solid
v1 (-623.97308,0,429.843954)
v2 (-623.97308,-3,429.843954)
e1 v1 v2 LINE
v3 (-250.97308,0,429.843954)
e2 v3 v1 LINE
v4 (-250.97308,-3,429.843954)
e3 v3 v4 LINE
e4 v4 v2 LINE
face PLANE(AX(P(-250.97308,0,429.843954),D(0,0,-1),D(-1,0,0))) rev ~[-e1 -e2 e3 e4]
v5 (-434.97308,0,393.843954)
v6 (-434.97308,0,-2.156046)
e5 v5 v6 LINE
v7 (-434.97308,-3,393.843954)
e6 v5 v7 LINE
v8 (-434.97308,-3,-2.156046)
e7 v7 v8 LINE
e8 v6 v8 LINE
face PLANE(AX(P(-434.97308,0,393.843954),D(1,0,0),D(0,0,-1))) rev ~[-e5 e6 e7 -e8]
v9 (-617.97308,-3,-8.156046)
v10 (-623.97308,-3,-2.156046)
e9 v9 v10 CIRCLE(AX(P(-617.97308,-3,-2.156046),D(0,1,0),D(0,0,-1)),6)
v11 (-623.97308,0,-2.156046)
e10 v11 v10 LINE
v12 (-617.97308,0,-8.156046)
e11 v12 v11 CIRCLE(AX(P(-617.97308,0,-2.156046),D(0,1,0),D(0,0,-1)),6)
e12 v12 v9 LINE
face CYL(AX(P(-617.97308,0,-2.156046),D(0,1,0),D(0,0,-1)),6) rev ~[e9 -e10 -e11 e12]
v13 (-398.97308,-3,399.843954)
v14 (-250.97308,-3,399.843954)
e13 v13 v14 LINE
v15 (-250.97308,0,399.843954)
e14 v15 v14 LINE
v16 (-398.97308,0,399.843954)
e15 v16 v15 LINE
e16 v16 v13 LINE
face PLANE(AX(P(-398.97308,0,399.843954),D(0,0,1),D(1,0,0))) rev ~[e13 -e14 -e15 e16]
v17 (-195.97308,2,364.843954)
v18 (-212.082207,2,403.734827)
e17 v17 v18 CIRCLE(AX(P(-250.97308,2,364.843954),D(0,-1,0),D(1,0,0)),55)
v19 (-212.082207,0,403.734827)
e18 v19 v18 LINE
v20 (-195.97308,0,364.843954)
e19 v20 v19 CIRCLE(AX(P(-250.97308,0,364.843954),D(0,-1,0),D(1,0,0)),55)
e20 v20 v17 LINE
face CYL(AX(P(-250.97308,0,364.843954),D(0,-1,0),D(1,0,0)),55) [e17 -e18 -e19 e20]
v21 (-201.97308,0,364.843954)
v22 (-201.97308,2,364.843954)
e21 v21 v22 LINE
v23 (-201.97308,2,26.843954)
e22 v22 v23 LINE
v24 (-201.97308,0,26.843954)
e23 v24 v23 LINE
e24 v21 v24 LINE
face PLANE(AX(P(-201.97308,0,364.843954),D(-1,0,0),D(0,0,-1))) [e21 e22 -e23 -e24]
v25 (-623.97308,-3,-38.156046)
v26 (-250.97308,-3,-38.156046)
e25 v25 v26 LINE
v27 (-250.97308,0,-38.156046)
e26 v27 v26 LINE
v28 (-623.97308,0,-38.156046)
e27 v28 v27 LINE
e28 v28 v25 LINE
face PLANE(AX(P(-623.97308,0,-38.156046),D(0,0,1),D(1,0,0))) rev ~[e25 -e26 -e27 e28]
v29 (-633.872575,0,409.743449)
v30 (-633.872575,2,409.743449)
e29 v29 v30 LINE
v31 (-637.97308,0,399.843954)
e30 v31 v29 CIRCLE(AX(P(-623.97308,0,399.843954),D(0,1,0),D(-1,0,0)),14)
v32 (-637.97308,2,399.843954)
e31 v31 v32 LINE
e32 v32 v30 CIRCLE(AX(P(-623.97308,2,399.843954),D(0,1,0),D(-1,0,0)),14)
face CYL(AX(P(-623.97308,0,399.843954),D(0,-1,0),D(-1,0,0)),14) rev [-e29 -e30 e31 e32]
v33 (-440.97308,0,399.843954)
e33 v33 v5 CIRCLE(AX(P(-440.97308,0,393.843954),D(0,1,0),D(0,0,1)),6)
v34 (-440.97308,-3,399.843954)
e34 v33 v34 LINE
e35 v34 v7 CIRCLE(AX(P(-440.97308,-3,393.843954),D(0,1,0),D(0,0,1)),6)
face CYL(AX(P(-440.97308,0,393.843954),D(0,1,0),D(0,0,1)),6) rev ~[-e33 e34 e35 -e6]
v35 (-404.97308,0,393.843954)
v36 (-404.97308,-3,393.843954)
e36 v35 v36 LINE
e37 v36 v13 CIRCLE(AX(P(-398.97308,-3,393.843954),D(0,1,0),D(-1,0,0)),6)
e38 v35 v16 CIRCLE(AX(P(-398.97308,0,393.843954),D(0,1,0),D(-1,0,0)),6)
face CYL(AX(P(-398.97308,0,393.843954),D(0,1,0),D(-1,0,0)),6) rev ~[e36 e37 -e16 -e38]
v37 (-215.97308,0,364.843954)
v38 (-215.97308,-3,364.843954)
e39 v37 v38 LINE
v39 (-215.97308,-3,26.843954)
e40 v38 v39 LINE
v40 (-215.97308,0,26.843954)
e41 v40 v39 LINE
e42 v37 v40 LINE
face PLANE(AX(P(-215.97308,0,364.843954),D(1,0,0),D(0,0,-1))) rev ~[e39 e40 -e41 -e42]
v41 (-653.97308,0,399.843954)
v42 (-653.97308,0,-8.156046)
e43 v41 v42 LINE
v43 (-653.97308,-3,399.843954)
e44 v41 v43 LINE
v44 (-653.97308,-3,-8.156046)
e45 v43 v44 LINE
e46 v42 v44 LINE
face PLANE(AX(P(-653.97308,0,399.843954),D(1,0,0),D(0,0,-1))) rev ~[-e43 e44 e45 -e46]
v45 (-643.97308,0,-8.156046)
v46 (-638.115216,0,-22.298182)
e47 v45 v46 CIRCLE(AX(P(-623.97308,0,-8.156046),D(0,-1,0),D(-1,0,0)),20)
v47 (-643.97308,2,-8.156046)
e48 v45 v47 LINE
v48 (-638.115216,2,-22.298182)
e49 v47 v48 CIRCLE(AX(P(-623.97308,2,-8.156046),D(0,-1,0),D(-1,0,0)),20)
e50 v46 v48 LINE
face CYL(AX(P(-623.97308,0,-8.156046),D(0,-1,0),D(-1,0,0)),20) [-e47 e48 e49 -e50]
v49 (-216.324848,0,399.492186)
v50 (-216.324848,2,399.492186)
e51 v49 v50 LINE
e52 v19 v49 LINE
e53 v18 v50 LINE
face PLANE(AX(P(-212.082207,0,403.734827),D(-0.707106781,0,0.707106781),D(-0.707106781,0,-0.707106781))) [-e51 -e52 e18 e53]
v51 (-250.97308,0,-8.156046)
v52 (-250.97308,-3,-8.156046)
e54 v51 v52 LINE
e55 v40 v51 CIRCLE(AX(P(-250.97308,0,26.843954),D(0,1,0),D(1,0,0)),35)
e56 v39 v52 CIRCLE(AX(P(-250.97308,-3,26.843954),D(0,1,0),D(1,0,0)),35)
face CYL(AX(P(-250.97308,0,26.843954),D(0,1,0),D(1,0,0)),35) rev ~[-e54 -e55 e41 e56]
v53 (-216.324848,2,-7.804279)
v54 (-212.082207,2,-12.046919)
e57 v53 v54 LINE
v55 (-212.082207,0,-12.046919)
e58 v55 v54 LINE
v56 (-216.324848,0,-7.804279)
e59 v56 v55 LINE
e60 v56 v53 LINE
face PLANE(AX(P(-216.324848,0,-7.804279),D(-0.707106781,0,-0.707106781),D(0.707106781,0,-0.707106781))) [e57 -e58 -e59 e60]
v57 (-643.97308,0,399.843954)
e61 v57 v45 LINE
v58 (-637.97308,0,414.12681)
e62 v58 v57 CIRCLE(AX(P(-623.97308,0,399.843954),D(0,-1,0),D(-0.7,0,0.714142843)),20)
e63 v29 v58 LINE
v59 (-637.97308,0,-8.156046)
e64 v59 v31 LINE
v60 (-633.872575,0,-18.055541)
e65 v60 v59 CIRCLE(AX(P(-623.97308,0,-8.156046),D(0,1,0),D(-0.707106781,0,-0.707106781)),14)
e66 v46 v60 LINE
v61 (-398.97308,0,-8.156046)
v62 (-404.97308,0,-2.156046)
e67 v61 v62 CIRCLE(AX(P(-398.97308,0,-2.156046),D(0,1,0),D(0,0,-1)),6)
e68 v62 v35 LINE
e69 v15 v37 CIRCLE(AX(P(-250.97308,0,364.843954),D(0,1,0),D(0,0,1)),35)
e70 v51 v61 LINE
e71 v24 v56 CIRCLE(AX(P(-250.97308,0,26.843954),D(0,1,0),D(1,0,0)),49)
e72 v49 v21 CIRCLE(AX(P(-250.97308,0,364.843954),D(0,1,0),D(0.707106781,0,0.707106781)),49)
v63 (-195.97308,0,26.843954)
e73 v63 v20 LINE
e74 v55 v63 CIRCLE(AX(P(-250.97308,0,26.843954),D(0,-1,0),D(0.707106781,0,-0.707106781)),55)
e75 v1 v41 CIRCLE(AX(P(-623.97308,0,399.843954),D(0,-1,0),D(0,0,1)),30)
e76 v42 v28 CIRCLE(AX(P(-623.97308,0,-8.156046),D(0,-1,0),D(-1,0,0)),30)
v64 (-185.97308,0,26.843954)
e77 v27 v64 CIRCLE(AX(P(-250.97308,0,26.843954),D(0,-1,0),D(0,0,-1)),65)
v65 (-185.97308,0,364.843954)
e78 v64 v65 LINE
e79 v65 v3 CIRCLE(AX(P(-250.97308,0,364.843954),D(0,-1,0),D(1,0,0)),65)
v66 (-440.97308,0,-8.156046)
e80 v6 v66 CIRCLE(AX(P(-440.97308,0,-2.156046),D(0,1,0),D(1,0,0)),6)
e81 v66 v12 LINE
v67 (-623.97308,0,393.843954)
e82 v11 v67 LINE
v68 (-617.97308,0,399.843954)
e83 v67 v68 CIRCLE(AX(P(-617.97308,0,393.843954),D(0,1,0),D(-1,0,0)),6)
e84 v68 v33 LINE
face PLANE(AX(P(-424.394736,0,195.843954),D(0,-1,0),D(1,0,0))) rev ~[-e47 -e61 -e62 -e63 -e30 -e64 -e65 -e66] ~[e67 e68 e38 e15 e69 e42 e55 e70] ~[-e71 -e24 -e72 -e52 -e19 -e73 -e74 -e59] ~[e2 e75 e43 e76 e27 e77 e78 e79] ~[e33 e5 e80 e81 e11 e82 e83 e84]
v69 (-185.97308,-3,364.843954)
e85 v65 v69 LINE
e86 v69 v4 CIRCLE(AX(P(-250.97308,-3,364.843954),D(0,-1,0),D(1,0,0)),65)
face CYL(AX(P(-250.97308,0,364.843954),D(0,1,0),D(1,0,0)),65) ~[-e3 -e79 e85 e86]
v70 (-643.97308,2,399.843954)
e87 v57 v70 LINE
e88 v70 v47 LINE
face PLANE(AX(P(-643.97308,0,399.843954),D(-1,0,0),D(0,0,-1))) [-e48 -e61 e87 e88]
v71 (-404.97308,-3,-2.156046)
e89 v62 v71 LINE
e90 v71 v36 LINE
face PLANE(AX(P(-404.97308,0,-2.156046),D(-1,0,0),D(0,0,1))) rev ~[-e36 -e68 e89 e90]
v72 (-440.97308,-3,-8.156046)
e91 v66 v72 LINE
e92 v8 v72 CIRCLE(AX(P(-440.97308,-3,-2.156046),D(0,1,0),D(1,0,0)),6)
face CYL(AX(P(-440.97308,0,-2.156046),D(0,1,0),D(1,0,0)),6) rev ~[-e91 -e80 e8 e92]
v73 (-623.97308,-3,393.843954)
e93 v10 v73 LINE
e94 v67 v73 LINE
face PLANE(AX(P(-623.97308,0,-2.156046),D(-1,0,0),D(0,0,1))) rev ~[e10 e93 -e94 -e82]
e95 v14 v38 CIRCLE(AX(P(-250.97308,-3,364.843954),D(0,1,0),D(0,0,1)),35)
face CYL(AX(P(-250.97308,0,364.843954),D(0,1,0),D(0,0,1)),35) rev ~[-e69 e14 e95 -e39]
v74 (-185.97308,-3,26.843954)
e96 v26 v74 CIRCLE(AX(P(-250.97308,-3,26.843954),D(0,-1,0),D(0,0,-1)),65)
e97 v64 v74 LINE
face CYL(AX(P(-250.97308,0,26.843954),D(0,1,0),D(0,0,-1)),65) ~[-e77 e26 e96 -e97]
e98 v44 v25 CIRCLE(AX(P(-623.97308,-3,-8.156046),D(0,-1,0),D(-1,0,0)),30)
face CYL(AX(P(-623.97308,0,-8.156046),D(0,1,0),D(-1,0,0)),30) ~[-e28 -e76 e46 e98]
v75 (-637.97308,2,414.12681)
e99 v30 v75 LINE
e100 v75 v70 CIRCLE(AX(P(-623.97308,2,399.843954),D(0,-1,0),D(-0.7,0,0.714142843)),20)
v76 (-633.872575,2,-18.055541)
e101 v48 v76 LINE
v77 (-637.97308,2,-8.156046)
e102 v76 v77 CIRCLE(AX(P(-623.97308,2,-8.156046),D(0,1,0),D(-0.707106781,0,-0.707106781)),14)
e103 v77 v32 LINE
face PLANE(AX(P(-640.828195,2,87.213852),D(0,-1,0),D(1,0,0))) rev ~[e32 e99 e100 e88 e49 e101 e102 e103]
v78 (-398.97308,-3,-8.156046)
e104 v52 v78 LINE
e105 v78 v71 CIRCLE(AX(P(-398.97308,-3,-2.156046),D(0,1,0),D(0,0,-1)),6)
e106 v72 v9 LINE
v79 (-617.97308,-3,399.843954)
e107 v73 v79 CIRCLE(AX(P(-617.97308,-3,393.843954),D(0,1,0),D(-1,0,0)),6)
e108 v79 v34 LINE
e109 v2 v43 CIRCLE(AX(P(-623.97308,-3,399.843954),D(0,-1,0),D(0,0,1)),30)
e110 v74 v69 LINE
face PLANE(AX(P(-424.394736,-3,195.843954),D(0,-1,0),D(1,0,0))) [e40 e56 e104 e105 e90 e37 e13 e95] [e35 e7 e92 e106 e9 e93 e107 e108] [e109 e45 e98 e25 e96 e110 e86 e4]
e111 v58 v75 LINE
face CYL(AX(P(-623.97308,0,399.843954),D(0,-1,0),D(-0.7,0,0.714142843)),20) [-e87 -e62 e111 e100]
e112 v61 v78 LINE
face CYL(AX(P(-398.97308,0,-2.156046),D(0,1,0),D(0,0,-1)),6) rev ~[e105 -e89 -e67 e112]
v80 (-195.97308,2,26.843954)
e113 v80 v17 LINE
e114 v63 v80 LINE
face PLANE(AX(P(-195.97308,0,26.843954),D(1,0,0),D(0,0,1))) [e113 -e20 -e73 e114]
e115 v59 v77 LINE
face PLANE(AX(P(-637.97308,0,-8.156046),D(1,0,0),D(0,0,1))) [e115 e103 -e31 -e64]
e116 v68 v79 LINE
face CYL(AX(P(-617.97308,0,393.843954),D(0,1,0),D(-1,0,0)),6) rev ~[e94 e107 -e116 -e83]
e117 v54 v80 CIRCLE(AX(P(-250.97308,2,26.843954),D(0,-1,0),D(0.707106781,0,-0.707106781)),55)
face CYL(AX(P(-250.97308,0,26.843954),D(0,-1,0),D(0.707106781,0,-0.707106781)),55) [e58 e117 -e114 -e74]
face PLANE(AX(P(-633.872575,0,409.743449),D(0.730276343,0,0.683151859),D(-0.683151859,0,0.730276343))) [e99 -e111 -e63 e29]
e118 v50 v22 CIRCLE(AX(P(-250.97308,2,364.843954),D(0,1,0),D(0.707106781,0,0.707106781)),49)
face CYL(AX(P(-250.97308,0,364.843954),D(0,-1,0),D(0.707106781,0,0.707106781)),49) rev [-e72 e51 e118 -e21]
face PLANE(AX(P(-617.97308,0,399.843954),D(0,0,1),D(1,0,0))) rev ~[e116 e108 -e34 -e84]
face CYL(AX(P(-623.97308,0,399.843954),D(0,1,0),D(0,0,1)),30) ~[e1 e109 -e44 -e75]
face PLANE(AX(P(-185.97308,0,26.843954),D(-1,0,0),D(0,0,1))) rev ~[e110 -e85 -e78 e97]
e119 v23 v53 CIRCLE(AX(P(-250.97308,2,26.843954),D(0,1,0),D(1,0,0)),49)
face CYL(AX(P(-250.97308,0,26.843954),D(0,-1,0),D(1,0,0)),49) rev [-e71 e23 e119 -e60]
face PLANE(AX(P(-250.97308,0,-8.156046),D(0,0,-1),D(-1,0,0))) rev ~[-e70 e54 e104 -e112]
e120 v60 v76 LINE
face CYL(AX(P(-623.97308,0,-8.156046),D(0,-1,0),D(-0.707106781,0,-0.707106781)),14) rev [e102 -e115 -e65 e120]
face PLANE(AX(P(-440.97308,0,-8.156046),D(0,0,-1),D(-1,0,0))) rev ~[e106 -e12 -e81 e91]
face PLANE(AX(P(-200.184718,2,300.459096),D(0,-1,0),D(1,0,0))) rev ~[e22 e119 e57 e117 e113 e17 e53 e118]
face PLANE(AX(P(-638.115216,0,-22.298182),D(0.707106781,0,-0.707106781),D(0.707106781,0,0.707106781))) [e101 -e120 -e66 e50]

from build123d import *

# Parameters (mm, degrees)
F1_DEPTH = 3
F2_DEPTH = 2


# Not quite as in the source:
# - a feature names something its author has since deleted; it is built from what else it names


with BuildPart() as f1:
    # F0 (on Front) → F1 (new body)
    with BuildSketch(Plane.XZ):
        with BuildLine():
            Line((-185.9730800638, 26.8439535797), (-185.9730800638, 364.8439535797))
            ThreePointArc((-185.9730800638, 364.8439535797), (-205.0111392867, 410.8058943568), (-250.9730800638, 429.8439535797))
            Line((-250.9730800638, 429.8439535797), (-623.9730800638, 429.8439535797))
            ThreePointArc((-623.9730800638, 429.8439535797), (-645.1862834994, 421.0571570153), (-653.9730800638, 399.8439535797))
            Line((-653.9730800638, 399.8439535797), (-653.9730800638, -8.1560464203))
            ThreePointArc((-653.9730800638, -8.1560464203), (-645.1862834994, -29.3692498559), (-623.9730800638, -38.1560464203))
            Line((-623.9730800638, -38.1560464203), (-250.9730800638, -38.1560464203))
            ThreePointArc((-250.9730800638, -38.1560464203), (-205.0111392867, -19.1179871975), (-185.9730800638, 26.8439535797))
        make_face()
        with BuildLine():
            ThreePointArc((-637.9730800638, 414.1268104367), (-631.5342592992, 418.3595839651), (-623.9730800638, 419.8439535797))
            Line((-623.9730800638, 419.8439535797), (-250.9730800638, 419.8439535797))
            ThreePointArc((-250.9730800638, 419.8439535797), (-229.9254912838, 415.6573278678), (-212.0822070986, 403.7348265449))
            ThreePointArc((-212.0822070986, 403.7348265449), (-200.1597057757, 385.8915423597), (-195.9730800638, 364.8439535797))
            Line((-195.9730800638, 364.8439535797), (-195.9730800638, 195.8439535797))
            Line((-195.9730800638, 195.8439535797), (-195.9730800638, 26.8439535797))
            ThreePointArc((-195.9730800638, 26.8439535797), (-200.1597057757, 5.7963647996), (-212.0822070986, -12.0469193856))
            ThreePointArc((-212.0822070986, -12.0469193856), (-229.9254912838, -23.9694207085), (-250.9730800638, -28.1560464203))
            Line((-250.9730800638, -28.1560464203), (-623.9730800638, -28.1560464203))
            ThreePointArc((-623.9730800638, -28.1560464203), (-631.6267487111, -26.6336370706), (-638.1152156876, -22.2981820441))
            ThreePointArc((-638.1152156876, -22.2981820441), (-642.4506707141, -15.8097150676), (-643.9730800638, -8.1560464203))
            Line((-643.9730800638, -8.1560464203), (-643.9730800638, 195.8439535797))
            Line((-643.9730800638, 195.8439535797), (-643.9730800638, 399.8439535797))
            ThreePointArc((-643.9730800638, 399.8439535797), (-642.4121689784, 407.5899202721), (-637.9730800638, 414.1268104367))
        make_face(mode=Mode.SUBTRACT)
        with BuildLine():
            ThreePointArc((-623.9730800638, 413.8439535797), (-629.330648117, 412.7782670348), (-633.8725750005, 409.7434485163))
            ThreePointArc((-633.8725750005, 409.7434485163), (-636.907393519, 405.2015216328), (-637.9730800638, 399.8439535797))
            Line((-637.9730800638, 399.8439535797), (-637.9730800638, 195.8439535797))
            Line((-637.9730800638, 195.8439535797), (-637.9730800638, -8.1560464203))
            ThreePointArc((-637.9730800638, -8.1560464203), (-636.907393519, -13.5136144734), (-633.8725750005, -18.0555413569))
            ThreePointArc((-633.8725750005, -18.0555413569), (-629.330648117, -21.0903598755), (-623.9730800638, -22.1560464203))
            Line((-623.9730800638, -22.1560464203), (-428.9730800638, -22.1560464203))
            ThreePointArc((-428.9730800638, -22.1560464203), (-424.7304393767, -20.3986871075), (-422.9730800638, -16.1560464203))
            Line((-422.9730800638, -16.1560464203), (-422.9730800638, 407.8439535797))
            ThreePointArc((-422.9730800638, 407.8439535797), (-424.7304393767, 412.0865942668), (-428.9730800638, 413.8439535797))
            Line((-428.9730800638, 413.8439535797), (-623.9730800638, 413.8439535797))
        make_face()
        with BuildLine():
            Line((-623.9730800638, -2.1560464203), (-623.9730800638, 393.8439535797))
            ThreePointArc((-623.9730800638, 393.8439535797), (-622.215720751, 398.0865942668), (-617.9730800638, 399.8439535797))
            Line((-617.9730800638, 399.8439535797), (-440.9730800638, 399.8439535797))
            ThreePointArc((-440.9730800638, 399.8439535797), (-436.7304393767, 398.0865942668), (-434.9730800638, 393.8439535797))
            Line((-434.9730800638, 393.8439535797), (-434.9730800638, -2.1560464203))
            ThreePointArc((-434.9730800638, -2.1560464203), (-436.7304393767, -6.3986871075), (-440.9730800638, -8.1560464203))
            Line((-440.9730800638, -8.1560464203), (-617.9730800638, -8.1560464203))
            ThreePointArc((-617.9730800638, -8.1560464203), (-622.215720751, -6.3986871075), (-623.9730800638, -2.1560464203))
        make_face(mode=Mode.SUBTRACT)
        with BuildLine():
            ThreePointArc((-201.9730800638, 364.8439535797), (-205.7029829708, 383.5954417656), (-216.3248477857, 399.4921858578))
            ThreePointArc((-216.3248477857, 399.4921858578), (-232.221591878, 410.1140506727), (-250.9730800638, 413.8439535797))
            Line((-250.9730800638, 413.8439535797), (-410.9730800638, 413.8439535797))
            ThreePointArc((-410.9730800638, 413.8439535797), (-415.215720751, 412.0865942668), (-416.9730800638, 407.8439535797))
            Line((-416.9730800638, 407.8439535797), (-416.9730800638, -16.1560464203))
            ThreePointArc((-416.9730800638, -16.1560464203), (-415.215720751, -20.3986871075), (-410.9730800638, -22.1560464203))
            Line((-410.9730800638, -22.1560464203), (-250.9730800638, -22.1560464203))
            ThreePointArc((-250.9730800638, -22.1560464203), (-232.221591878, -18.4261435134), (-216.3248477857, -7.8042786985))
            ThreePointArc((-216.3248477857, -7.8042786985), (-205.7029829708, 8.0924653938), (-201.9730800638, 26.8439535797))
            Line((-201.9730800638, 26.8439535797), (-201.9730800638, 195.8439535797))
            Line((-201.9730800638, 195.8439535797), (-201.9730800638, 364.8439535797))
        make_face()
        with BuildLine():
            ThreePointArc((-404.9730800638, 393.8439535797), (-403.215720751, 398.0865942668), (-398.9730800638, 399.8439535797))
            Line((-398.9730800638, 399.8439535797), (-250.9730800638, 399.8439535797))
            ThreePointArc((-250.9730800638, 399.8439535797), (-226.2243427223, 389.5926909212), (-215.9730800638, 364.8439535797))
            Line((-215.9730800638, 364.8439535797), (-215.9730800638, 26.8439535797))
            ThreePointArc((-215.9730800638, 26.8439535797), (-226.2243427223, 2.0952162381), (-250.9730800638, -8.1560464203))
            Line((-250.9730800638, -8.1560464203), (-398.9730800638, -8.1560464203))
            ThreePointArc((-398.9730800638, -8.1560464203), (-403.215720751, -6.3986871075), (-404.9730800638, -2.1560464203))
            Line((-404.9730800638, -2.1560464203), (-404.9730800638, 393.8439535797))
        make_face(mode=Mode.SUBTRACT)
        with BuildLine():
            Line((-250.9730800638, 419.8439535797), (-623.9730800638, 419.8439535797))
            ThreePointArc((-623.9730800638, 419.8439535797), (-631.5342592992, 418.3595839651), (-637.9730800638, 414.1268104367))
            Line((-637.9730800638, 414.1268104367), (-633.8725750005, 409.7434485163))
            ThreePointArc((-633.8725750005, 409.7434485163), (-629.330648117, 412.7782670348), (-623.9730800638, 413.8439535797))
            Line((-623.9730800638, 413.8439535797), (-428.9730800638, 413.8439535797))
            ThreePointArc((-428.9730800638, 413.8439535797), (-424.7304393767, 412.0865942668), (-422.9730800638, 407.8439535797))
            Line((-422.9730800638, 407.8439535797), (-422.9730800638, -16.1560464203))
            ThreePointArc((-422.9730800638, -16.1560464203), (-424.7304393767, -20.3986871075), (-428.9730800638, -22.1560464203))
            Line((-428.9730800638, -22.1560464203), (-623.9730800638, -22.1560464203))
            ThreePointArc((-623.9730800638, -22.1560464203), (-629.330648117, -21.0903598755), (-633.8725750005, -18.0555413569))
            Line((-633.8725750005, -18.0555413569), (-638.1152156876, -22.2981820441))
            ThreePointArc((-638.1152156876, -22.2981820441), (-631.6267487111, -26.6336370706), (-623.9730800638, -28.1560464203))
            Line((-623.9730800638, -28.1560464203), (-250.9730800638, -28.1560464203))
            ThreePointArc((-250.9730800638, -28.1560464203), (-229.9254912838, -23.9694207085), (-212.0822070986, -12.0469193856))
            Line((-212.0822070986, -12.0469193856), (-216.3248477857, -7.8042786985))
            ThreePointArc((-216.3248477857, -7.8042786985), (-232.221591878, -18.4261435134), (-250.9730800638, -22.1560464203))
            Line((-250.9730800638, -22.1560464203), (-410.9730800638, -22.1560464203))
            ThreePointArc((-410.9730800638, -22.1560464203), (-415.215720751, -20.3986871075), (-416.9730800638, -16.1560464203))
            Line((-416.9730800638, -16.1560464203), (-416.9730800638, 407.8439535797))
            ThreePointArc((-416.9730800638, 407.8439535797), (-415.215720751, 412.0865942668), (-410.9730800638, 413.8439535797))
            Line((-410.9730800638, 413.8439535797), (-250.9730800638, 413.8439535797))
            ThreePointArc((-250.9730800638, 413.8439535797), (-232.221591878, 410.1140506727), (-216.3248477857, 399.4921858578))
            Line((-216.3248477857, 399.4921858578), (-212.0822070986, 403.7348265449))
            ThreePointArc((-212.0822070986, 403.7348265449), (-229.9254912838, 415.6573278678), (-250.9730800638, 419.8439535797))
        make_face()
        with BuildLine():
            Line((-633.8725750005, 409.7434485163), (-637.9730800638, 414.1268104367))
            ThreePointArc((-637.9730800638, 414.1268104367), (-642.4121689784, 407.5899202721), (-643.9730800638, 399.8439535797))
            Line((-643.9730800638, 399.8439535797), (-643.9730800638, 195.8439535797))
            Line((-643.9730800638, 195.8439535797), (-637.9730800638, 195.8439535797))
            Line((-637.9730800638, 195.8439535797), (-637.9730800638, 399.8439535797))
            ThreePointArc((-637.9730800638, 399.8439535797), (-636.907393519, 405.2015216328), (-633.8725750005, 409.7434485163))
        make_face()
        with BuildLine():
            Line((-637.9730800638, 195.8439535797), (-643.9730800638, 195.8439535797))
            Line((-643.9730800638, 195.8439535797), (-643.9730800638, -8.1560464203))
            ThreePointArc((-643.9730800638, -8.1560464203), (-642.4506707141, -15.8097150676), (-638.1152156876, -22.2981820441))
            Line((-638.1152156876, -22.2981820441), (-633.8725750005, -18.0555413569))
            ThreePointArc((-633.8725750005, -18.0555413569), (-636.907393519, -13.5136144734), (-637.9730800638, -8.1560464203))
            Line((-637.9730800638, -8.1560464203), (-637.9730800638, 195.8439535797))
        make_face()
        with BuildLine():
            ThreePointArc((-195.9730800638, 364.8439535797), (-200.1597057757, 385.8915423597), (-212.0822070986, 403.7348265449))
            Line((-212.0822070986, 403.7348265449), (-216.3248477857, 399.4921858578))
            ThreePointArc((-216.3248477857, 399.4921858578), (-205.7029829708, 383.5954417656), (-201.9730800638, 364.8439535797))
            Line((-201.9730800638, 364.8439535797), (-201.9730800638, 195.8439535797))
            Line((-201.9730800638, 195.8439535797), (-195.9730800638, 195.8439535797))
            Line((-195.9730800638, 195.8439535797), (-195.9730800638, 364.8439535797))
        make_face()
        with BuildLine():
            Line((-195.9730800638, 26.8439535797), (-195.9730800638, 195.8439535797))
            Line((-195.9730800638, 195.8439535797), (-201.9730800638, 195.8439535797))
            Line((-201.9730800638, 195.8439535797), (-201.9730800638, 26.8439535797))
            ThreePointArc((-201.9730800638, 26.8439535797), (-205.7029829708, 8.0924653938), (-216.3248477857, -7.8042786985))
            Line((-216.3248477857, -7.8042786985), (-212.0822070986, -12.0469193856))
            ThreePointArc((-212.0822070986, -12.0469193856), (-200.1597057757, 5.7963647996), (-195.9730800638, 26.8439535797))
        make_face()
    extrude(amount=F1_DEPTH)

    # F0 (on Front) → F2 (join)
    with BuildSketch(Plane.XZ):
        with BuildLine():
            ThreePointArc((-195.9730800638, 364.8439535797), (-200.1597057757, 385.8915423597), (-212.0822070986, 403.7348265449))
            Line((-212.0822070986, 403.7348265449), (-216.3248477857, 399.4921858578))
            ThreePointArc((-216.3248477857, 399.4921858578), (-205.7029829708, 383.5954417656), (-201.9730800638, 364.8439535797))
            Line((-201.9730800638, 364.8439535797), (-201.9730800638, 195.8439535797))
            Line((-201.9730800638, 195.8439535797), (-195.9730800638, 195.8439535797))
            Line((-195.9730800638, 195.8439535797), (-195.9730800638, 364.8439535797))
        make_face()
        with BuildLine():
            Line((-195.9730800638, 26.8439535797), (-195.9730800638, 195.8439535797))
            Line((-195.9730800638, 195.8439535797), (-201.9730800638, 195.8439535797))
            Line((-201.9730800638, 195.8439535797), (-201.9730800638, 26.8439535797))
            ThreePointArc((-201.9730800638, 26.8439535797), (-205.7029829708, 8.0924653938), (-216.3248477857, -7.8042786985))
            Line((-216.3248477857, -7.8042786985), (-212.0822070986, -12.0469193856))
            ThreePointArc((-212.0822070986, -12.0469193856), (-200.1597057757, 5.7963647996), (-195.9730800638, 26.8439535797))
        make_face()
        with BuildLine():
            Line((-637.9730800638, 195.8439535797), (-643.9730800638, 195.8439535797))
            Line((-643.9730800638, 195.8439535797), (-643.9730800638, -8.1560464203))
            ThreePointArc((-643.9730800638, -8.1560464203), (-642.4506707141, -15.8097150676), (-638.1152156876, -22.2981820441))
            Line((-638.1152156876, -22.2981820441), (-633.8725750005, -18.0555413569))
            ThreePointArc((-633.8725750005, -18.0555413569), (-636.907393519, -13.5136144734), (-637.9730800638, -8.1560464203))
            Line((-637.9730800638, -8.1560464203), (-637.9730800638, 195.8439535797))
        make_face()
        with BuildLine():
            Line((-633.8725750005, 409.7434485163), (-637.9730800638, 414.1268104367))
            ThreePointArc((-637.9730800638, 414.1268104367), (-642.4121689784, 407.5899202721), (-643.9730800638, 399.8439535797))
            Line((-643.9730800638, 399.8439535797), (-643.9730800638, 195.8439535797))
            Line((-643.9730800638, 195.8439535797), (-637.9730800638, 195.8439535797))
            Line((-637.9730800638, 195.8439535797), (-637.9730800638, 399.8439535797))
            ThreePointArc((-637.9730800638, 399.8439535797), (-636.907393519, 405.2015216328), (-633.8725750005, 409.7434485163))
        make_face()
    extrude(amount=-F2_DEPTH)


solid = f1.part
